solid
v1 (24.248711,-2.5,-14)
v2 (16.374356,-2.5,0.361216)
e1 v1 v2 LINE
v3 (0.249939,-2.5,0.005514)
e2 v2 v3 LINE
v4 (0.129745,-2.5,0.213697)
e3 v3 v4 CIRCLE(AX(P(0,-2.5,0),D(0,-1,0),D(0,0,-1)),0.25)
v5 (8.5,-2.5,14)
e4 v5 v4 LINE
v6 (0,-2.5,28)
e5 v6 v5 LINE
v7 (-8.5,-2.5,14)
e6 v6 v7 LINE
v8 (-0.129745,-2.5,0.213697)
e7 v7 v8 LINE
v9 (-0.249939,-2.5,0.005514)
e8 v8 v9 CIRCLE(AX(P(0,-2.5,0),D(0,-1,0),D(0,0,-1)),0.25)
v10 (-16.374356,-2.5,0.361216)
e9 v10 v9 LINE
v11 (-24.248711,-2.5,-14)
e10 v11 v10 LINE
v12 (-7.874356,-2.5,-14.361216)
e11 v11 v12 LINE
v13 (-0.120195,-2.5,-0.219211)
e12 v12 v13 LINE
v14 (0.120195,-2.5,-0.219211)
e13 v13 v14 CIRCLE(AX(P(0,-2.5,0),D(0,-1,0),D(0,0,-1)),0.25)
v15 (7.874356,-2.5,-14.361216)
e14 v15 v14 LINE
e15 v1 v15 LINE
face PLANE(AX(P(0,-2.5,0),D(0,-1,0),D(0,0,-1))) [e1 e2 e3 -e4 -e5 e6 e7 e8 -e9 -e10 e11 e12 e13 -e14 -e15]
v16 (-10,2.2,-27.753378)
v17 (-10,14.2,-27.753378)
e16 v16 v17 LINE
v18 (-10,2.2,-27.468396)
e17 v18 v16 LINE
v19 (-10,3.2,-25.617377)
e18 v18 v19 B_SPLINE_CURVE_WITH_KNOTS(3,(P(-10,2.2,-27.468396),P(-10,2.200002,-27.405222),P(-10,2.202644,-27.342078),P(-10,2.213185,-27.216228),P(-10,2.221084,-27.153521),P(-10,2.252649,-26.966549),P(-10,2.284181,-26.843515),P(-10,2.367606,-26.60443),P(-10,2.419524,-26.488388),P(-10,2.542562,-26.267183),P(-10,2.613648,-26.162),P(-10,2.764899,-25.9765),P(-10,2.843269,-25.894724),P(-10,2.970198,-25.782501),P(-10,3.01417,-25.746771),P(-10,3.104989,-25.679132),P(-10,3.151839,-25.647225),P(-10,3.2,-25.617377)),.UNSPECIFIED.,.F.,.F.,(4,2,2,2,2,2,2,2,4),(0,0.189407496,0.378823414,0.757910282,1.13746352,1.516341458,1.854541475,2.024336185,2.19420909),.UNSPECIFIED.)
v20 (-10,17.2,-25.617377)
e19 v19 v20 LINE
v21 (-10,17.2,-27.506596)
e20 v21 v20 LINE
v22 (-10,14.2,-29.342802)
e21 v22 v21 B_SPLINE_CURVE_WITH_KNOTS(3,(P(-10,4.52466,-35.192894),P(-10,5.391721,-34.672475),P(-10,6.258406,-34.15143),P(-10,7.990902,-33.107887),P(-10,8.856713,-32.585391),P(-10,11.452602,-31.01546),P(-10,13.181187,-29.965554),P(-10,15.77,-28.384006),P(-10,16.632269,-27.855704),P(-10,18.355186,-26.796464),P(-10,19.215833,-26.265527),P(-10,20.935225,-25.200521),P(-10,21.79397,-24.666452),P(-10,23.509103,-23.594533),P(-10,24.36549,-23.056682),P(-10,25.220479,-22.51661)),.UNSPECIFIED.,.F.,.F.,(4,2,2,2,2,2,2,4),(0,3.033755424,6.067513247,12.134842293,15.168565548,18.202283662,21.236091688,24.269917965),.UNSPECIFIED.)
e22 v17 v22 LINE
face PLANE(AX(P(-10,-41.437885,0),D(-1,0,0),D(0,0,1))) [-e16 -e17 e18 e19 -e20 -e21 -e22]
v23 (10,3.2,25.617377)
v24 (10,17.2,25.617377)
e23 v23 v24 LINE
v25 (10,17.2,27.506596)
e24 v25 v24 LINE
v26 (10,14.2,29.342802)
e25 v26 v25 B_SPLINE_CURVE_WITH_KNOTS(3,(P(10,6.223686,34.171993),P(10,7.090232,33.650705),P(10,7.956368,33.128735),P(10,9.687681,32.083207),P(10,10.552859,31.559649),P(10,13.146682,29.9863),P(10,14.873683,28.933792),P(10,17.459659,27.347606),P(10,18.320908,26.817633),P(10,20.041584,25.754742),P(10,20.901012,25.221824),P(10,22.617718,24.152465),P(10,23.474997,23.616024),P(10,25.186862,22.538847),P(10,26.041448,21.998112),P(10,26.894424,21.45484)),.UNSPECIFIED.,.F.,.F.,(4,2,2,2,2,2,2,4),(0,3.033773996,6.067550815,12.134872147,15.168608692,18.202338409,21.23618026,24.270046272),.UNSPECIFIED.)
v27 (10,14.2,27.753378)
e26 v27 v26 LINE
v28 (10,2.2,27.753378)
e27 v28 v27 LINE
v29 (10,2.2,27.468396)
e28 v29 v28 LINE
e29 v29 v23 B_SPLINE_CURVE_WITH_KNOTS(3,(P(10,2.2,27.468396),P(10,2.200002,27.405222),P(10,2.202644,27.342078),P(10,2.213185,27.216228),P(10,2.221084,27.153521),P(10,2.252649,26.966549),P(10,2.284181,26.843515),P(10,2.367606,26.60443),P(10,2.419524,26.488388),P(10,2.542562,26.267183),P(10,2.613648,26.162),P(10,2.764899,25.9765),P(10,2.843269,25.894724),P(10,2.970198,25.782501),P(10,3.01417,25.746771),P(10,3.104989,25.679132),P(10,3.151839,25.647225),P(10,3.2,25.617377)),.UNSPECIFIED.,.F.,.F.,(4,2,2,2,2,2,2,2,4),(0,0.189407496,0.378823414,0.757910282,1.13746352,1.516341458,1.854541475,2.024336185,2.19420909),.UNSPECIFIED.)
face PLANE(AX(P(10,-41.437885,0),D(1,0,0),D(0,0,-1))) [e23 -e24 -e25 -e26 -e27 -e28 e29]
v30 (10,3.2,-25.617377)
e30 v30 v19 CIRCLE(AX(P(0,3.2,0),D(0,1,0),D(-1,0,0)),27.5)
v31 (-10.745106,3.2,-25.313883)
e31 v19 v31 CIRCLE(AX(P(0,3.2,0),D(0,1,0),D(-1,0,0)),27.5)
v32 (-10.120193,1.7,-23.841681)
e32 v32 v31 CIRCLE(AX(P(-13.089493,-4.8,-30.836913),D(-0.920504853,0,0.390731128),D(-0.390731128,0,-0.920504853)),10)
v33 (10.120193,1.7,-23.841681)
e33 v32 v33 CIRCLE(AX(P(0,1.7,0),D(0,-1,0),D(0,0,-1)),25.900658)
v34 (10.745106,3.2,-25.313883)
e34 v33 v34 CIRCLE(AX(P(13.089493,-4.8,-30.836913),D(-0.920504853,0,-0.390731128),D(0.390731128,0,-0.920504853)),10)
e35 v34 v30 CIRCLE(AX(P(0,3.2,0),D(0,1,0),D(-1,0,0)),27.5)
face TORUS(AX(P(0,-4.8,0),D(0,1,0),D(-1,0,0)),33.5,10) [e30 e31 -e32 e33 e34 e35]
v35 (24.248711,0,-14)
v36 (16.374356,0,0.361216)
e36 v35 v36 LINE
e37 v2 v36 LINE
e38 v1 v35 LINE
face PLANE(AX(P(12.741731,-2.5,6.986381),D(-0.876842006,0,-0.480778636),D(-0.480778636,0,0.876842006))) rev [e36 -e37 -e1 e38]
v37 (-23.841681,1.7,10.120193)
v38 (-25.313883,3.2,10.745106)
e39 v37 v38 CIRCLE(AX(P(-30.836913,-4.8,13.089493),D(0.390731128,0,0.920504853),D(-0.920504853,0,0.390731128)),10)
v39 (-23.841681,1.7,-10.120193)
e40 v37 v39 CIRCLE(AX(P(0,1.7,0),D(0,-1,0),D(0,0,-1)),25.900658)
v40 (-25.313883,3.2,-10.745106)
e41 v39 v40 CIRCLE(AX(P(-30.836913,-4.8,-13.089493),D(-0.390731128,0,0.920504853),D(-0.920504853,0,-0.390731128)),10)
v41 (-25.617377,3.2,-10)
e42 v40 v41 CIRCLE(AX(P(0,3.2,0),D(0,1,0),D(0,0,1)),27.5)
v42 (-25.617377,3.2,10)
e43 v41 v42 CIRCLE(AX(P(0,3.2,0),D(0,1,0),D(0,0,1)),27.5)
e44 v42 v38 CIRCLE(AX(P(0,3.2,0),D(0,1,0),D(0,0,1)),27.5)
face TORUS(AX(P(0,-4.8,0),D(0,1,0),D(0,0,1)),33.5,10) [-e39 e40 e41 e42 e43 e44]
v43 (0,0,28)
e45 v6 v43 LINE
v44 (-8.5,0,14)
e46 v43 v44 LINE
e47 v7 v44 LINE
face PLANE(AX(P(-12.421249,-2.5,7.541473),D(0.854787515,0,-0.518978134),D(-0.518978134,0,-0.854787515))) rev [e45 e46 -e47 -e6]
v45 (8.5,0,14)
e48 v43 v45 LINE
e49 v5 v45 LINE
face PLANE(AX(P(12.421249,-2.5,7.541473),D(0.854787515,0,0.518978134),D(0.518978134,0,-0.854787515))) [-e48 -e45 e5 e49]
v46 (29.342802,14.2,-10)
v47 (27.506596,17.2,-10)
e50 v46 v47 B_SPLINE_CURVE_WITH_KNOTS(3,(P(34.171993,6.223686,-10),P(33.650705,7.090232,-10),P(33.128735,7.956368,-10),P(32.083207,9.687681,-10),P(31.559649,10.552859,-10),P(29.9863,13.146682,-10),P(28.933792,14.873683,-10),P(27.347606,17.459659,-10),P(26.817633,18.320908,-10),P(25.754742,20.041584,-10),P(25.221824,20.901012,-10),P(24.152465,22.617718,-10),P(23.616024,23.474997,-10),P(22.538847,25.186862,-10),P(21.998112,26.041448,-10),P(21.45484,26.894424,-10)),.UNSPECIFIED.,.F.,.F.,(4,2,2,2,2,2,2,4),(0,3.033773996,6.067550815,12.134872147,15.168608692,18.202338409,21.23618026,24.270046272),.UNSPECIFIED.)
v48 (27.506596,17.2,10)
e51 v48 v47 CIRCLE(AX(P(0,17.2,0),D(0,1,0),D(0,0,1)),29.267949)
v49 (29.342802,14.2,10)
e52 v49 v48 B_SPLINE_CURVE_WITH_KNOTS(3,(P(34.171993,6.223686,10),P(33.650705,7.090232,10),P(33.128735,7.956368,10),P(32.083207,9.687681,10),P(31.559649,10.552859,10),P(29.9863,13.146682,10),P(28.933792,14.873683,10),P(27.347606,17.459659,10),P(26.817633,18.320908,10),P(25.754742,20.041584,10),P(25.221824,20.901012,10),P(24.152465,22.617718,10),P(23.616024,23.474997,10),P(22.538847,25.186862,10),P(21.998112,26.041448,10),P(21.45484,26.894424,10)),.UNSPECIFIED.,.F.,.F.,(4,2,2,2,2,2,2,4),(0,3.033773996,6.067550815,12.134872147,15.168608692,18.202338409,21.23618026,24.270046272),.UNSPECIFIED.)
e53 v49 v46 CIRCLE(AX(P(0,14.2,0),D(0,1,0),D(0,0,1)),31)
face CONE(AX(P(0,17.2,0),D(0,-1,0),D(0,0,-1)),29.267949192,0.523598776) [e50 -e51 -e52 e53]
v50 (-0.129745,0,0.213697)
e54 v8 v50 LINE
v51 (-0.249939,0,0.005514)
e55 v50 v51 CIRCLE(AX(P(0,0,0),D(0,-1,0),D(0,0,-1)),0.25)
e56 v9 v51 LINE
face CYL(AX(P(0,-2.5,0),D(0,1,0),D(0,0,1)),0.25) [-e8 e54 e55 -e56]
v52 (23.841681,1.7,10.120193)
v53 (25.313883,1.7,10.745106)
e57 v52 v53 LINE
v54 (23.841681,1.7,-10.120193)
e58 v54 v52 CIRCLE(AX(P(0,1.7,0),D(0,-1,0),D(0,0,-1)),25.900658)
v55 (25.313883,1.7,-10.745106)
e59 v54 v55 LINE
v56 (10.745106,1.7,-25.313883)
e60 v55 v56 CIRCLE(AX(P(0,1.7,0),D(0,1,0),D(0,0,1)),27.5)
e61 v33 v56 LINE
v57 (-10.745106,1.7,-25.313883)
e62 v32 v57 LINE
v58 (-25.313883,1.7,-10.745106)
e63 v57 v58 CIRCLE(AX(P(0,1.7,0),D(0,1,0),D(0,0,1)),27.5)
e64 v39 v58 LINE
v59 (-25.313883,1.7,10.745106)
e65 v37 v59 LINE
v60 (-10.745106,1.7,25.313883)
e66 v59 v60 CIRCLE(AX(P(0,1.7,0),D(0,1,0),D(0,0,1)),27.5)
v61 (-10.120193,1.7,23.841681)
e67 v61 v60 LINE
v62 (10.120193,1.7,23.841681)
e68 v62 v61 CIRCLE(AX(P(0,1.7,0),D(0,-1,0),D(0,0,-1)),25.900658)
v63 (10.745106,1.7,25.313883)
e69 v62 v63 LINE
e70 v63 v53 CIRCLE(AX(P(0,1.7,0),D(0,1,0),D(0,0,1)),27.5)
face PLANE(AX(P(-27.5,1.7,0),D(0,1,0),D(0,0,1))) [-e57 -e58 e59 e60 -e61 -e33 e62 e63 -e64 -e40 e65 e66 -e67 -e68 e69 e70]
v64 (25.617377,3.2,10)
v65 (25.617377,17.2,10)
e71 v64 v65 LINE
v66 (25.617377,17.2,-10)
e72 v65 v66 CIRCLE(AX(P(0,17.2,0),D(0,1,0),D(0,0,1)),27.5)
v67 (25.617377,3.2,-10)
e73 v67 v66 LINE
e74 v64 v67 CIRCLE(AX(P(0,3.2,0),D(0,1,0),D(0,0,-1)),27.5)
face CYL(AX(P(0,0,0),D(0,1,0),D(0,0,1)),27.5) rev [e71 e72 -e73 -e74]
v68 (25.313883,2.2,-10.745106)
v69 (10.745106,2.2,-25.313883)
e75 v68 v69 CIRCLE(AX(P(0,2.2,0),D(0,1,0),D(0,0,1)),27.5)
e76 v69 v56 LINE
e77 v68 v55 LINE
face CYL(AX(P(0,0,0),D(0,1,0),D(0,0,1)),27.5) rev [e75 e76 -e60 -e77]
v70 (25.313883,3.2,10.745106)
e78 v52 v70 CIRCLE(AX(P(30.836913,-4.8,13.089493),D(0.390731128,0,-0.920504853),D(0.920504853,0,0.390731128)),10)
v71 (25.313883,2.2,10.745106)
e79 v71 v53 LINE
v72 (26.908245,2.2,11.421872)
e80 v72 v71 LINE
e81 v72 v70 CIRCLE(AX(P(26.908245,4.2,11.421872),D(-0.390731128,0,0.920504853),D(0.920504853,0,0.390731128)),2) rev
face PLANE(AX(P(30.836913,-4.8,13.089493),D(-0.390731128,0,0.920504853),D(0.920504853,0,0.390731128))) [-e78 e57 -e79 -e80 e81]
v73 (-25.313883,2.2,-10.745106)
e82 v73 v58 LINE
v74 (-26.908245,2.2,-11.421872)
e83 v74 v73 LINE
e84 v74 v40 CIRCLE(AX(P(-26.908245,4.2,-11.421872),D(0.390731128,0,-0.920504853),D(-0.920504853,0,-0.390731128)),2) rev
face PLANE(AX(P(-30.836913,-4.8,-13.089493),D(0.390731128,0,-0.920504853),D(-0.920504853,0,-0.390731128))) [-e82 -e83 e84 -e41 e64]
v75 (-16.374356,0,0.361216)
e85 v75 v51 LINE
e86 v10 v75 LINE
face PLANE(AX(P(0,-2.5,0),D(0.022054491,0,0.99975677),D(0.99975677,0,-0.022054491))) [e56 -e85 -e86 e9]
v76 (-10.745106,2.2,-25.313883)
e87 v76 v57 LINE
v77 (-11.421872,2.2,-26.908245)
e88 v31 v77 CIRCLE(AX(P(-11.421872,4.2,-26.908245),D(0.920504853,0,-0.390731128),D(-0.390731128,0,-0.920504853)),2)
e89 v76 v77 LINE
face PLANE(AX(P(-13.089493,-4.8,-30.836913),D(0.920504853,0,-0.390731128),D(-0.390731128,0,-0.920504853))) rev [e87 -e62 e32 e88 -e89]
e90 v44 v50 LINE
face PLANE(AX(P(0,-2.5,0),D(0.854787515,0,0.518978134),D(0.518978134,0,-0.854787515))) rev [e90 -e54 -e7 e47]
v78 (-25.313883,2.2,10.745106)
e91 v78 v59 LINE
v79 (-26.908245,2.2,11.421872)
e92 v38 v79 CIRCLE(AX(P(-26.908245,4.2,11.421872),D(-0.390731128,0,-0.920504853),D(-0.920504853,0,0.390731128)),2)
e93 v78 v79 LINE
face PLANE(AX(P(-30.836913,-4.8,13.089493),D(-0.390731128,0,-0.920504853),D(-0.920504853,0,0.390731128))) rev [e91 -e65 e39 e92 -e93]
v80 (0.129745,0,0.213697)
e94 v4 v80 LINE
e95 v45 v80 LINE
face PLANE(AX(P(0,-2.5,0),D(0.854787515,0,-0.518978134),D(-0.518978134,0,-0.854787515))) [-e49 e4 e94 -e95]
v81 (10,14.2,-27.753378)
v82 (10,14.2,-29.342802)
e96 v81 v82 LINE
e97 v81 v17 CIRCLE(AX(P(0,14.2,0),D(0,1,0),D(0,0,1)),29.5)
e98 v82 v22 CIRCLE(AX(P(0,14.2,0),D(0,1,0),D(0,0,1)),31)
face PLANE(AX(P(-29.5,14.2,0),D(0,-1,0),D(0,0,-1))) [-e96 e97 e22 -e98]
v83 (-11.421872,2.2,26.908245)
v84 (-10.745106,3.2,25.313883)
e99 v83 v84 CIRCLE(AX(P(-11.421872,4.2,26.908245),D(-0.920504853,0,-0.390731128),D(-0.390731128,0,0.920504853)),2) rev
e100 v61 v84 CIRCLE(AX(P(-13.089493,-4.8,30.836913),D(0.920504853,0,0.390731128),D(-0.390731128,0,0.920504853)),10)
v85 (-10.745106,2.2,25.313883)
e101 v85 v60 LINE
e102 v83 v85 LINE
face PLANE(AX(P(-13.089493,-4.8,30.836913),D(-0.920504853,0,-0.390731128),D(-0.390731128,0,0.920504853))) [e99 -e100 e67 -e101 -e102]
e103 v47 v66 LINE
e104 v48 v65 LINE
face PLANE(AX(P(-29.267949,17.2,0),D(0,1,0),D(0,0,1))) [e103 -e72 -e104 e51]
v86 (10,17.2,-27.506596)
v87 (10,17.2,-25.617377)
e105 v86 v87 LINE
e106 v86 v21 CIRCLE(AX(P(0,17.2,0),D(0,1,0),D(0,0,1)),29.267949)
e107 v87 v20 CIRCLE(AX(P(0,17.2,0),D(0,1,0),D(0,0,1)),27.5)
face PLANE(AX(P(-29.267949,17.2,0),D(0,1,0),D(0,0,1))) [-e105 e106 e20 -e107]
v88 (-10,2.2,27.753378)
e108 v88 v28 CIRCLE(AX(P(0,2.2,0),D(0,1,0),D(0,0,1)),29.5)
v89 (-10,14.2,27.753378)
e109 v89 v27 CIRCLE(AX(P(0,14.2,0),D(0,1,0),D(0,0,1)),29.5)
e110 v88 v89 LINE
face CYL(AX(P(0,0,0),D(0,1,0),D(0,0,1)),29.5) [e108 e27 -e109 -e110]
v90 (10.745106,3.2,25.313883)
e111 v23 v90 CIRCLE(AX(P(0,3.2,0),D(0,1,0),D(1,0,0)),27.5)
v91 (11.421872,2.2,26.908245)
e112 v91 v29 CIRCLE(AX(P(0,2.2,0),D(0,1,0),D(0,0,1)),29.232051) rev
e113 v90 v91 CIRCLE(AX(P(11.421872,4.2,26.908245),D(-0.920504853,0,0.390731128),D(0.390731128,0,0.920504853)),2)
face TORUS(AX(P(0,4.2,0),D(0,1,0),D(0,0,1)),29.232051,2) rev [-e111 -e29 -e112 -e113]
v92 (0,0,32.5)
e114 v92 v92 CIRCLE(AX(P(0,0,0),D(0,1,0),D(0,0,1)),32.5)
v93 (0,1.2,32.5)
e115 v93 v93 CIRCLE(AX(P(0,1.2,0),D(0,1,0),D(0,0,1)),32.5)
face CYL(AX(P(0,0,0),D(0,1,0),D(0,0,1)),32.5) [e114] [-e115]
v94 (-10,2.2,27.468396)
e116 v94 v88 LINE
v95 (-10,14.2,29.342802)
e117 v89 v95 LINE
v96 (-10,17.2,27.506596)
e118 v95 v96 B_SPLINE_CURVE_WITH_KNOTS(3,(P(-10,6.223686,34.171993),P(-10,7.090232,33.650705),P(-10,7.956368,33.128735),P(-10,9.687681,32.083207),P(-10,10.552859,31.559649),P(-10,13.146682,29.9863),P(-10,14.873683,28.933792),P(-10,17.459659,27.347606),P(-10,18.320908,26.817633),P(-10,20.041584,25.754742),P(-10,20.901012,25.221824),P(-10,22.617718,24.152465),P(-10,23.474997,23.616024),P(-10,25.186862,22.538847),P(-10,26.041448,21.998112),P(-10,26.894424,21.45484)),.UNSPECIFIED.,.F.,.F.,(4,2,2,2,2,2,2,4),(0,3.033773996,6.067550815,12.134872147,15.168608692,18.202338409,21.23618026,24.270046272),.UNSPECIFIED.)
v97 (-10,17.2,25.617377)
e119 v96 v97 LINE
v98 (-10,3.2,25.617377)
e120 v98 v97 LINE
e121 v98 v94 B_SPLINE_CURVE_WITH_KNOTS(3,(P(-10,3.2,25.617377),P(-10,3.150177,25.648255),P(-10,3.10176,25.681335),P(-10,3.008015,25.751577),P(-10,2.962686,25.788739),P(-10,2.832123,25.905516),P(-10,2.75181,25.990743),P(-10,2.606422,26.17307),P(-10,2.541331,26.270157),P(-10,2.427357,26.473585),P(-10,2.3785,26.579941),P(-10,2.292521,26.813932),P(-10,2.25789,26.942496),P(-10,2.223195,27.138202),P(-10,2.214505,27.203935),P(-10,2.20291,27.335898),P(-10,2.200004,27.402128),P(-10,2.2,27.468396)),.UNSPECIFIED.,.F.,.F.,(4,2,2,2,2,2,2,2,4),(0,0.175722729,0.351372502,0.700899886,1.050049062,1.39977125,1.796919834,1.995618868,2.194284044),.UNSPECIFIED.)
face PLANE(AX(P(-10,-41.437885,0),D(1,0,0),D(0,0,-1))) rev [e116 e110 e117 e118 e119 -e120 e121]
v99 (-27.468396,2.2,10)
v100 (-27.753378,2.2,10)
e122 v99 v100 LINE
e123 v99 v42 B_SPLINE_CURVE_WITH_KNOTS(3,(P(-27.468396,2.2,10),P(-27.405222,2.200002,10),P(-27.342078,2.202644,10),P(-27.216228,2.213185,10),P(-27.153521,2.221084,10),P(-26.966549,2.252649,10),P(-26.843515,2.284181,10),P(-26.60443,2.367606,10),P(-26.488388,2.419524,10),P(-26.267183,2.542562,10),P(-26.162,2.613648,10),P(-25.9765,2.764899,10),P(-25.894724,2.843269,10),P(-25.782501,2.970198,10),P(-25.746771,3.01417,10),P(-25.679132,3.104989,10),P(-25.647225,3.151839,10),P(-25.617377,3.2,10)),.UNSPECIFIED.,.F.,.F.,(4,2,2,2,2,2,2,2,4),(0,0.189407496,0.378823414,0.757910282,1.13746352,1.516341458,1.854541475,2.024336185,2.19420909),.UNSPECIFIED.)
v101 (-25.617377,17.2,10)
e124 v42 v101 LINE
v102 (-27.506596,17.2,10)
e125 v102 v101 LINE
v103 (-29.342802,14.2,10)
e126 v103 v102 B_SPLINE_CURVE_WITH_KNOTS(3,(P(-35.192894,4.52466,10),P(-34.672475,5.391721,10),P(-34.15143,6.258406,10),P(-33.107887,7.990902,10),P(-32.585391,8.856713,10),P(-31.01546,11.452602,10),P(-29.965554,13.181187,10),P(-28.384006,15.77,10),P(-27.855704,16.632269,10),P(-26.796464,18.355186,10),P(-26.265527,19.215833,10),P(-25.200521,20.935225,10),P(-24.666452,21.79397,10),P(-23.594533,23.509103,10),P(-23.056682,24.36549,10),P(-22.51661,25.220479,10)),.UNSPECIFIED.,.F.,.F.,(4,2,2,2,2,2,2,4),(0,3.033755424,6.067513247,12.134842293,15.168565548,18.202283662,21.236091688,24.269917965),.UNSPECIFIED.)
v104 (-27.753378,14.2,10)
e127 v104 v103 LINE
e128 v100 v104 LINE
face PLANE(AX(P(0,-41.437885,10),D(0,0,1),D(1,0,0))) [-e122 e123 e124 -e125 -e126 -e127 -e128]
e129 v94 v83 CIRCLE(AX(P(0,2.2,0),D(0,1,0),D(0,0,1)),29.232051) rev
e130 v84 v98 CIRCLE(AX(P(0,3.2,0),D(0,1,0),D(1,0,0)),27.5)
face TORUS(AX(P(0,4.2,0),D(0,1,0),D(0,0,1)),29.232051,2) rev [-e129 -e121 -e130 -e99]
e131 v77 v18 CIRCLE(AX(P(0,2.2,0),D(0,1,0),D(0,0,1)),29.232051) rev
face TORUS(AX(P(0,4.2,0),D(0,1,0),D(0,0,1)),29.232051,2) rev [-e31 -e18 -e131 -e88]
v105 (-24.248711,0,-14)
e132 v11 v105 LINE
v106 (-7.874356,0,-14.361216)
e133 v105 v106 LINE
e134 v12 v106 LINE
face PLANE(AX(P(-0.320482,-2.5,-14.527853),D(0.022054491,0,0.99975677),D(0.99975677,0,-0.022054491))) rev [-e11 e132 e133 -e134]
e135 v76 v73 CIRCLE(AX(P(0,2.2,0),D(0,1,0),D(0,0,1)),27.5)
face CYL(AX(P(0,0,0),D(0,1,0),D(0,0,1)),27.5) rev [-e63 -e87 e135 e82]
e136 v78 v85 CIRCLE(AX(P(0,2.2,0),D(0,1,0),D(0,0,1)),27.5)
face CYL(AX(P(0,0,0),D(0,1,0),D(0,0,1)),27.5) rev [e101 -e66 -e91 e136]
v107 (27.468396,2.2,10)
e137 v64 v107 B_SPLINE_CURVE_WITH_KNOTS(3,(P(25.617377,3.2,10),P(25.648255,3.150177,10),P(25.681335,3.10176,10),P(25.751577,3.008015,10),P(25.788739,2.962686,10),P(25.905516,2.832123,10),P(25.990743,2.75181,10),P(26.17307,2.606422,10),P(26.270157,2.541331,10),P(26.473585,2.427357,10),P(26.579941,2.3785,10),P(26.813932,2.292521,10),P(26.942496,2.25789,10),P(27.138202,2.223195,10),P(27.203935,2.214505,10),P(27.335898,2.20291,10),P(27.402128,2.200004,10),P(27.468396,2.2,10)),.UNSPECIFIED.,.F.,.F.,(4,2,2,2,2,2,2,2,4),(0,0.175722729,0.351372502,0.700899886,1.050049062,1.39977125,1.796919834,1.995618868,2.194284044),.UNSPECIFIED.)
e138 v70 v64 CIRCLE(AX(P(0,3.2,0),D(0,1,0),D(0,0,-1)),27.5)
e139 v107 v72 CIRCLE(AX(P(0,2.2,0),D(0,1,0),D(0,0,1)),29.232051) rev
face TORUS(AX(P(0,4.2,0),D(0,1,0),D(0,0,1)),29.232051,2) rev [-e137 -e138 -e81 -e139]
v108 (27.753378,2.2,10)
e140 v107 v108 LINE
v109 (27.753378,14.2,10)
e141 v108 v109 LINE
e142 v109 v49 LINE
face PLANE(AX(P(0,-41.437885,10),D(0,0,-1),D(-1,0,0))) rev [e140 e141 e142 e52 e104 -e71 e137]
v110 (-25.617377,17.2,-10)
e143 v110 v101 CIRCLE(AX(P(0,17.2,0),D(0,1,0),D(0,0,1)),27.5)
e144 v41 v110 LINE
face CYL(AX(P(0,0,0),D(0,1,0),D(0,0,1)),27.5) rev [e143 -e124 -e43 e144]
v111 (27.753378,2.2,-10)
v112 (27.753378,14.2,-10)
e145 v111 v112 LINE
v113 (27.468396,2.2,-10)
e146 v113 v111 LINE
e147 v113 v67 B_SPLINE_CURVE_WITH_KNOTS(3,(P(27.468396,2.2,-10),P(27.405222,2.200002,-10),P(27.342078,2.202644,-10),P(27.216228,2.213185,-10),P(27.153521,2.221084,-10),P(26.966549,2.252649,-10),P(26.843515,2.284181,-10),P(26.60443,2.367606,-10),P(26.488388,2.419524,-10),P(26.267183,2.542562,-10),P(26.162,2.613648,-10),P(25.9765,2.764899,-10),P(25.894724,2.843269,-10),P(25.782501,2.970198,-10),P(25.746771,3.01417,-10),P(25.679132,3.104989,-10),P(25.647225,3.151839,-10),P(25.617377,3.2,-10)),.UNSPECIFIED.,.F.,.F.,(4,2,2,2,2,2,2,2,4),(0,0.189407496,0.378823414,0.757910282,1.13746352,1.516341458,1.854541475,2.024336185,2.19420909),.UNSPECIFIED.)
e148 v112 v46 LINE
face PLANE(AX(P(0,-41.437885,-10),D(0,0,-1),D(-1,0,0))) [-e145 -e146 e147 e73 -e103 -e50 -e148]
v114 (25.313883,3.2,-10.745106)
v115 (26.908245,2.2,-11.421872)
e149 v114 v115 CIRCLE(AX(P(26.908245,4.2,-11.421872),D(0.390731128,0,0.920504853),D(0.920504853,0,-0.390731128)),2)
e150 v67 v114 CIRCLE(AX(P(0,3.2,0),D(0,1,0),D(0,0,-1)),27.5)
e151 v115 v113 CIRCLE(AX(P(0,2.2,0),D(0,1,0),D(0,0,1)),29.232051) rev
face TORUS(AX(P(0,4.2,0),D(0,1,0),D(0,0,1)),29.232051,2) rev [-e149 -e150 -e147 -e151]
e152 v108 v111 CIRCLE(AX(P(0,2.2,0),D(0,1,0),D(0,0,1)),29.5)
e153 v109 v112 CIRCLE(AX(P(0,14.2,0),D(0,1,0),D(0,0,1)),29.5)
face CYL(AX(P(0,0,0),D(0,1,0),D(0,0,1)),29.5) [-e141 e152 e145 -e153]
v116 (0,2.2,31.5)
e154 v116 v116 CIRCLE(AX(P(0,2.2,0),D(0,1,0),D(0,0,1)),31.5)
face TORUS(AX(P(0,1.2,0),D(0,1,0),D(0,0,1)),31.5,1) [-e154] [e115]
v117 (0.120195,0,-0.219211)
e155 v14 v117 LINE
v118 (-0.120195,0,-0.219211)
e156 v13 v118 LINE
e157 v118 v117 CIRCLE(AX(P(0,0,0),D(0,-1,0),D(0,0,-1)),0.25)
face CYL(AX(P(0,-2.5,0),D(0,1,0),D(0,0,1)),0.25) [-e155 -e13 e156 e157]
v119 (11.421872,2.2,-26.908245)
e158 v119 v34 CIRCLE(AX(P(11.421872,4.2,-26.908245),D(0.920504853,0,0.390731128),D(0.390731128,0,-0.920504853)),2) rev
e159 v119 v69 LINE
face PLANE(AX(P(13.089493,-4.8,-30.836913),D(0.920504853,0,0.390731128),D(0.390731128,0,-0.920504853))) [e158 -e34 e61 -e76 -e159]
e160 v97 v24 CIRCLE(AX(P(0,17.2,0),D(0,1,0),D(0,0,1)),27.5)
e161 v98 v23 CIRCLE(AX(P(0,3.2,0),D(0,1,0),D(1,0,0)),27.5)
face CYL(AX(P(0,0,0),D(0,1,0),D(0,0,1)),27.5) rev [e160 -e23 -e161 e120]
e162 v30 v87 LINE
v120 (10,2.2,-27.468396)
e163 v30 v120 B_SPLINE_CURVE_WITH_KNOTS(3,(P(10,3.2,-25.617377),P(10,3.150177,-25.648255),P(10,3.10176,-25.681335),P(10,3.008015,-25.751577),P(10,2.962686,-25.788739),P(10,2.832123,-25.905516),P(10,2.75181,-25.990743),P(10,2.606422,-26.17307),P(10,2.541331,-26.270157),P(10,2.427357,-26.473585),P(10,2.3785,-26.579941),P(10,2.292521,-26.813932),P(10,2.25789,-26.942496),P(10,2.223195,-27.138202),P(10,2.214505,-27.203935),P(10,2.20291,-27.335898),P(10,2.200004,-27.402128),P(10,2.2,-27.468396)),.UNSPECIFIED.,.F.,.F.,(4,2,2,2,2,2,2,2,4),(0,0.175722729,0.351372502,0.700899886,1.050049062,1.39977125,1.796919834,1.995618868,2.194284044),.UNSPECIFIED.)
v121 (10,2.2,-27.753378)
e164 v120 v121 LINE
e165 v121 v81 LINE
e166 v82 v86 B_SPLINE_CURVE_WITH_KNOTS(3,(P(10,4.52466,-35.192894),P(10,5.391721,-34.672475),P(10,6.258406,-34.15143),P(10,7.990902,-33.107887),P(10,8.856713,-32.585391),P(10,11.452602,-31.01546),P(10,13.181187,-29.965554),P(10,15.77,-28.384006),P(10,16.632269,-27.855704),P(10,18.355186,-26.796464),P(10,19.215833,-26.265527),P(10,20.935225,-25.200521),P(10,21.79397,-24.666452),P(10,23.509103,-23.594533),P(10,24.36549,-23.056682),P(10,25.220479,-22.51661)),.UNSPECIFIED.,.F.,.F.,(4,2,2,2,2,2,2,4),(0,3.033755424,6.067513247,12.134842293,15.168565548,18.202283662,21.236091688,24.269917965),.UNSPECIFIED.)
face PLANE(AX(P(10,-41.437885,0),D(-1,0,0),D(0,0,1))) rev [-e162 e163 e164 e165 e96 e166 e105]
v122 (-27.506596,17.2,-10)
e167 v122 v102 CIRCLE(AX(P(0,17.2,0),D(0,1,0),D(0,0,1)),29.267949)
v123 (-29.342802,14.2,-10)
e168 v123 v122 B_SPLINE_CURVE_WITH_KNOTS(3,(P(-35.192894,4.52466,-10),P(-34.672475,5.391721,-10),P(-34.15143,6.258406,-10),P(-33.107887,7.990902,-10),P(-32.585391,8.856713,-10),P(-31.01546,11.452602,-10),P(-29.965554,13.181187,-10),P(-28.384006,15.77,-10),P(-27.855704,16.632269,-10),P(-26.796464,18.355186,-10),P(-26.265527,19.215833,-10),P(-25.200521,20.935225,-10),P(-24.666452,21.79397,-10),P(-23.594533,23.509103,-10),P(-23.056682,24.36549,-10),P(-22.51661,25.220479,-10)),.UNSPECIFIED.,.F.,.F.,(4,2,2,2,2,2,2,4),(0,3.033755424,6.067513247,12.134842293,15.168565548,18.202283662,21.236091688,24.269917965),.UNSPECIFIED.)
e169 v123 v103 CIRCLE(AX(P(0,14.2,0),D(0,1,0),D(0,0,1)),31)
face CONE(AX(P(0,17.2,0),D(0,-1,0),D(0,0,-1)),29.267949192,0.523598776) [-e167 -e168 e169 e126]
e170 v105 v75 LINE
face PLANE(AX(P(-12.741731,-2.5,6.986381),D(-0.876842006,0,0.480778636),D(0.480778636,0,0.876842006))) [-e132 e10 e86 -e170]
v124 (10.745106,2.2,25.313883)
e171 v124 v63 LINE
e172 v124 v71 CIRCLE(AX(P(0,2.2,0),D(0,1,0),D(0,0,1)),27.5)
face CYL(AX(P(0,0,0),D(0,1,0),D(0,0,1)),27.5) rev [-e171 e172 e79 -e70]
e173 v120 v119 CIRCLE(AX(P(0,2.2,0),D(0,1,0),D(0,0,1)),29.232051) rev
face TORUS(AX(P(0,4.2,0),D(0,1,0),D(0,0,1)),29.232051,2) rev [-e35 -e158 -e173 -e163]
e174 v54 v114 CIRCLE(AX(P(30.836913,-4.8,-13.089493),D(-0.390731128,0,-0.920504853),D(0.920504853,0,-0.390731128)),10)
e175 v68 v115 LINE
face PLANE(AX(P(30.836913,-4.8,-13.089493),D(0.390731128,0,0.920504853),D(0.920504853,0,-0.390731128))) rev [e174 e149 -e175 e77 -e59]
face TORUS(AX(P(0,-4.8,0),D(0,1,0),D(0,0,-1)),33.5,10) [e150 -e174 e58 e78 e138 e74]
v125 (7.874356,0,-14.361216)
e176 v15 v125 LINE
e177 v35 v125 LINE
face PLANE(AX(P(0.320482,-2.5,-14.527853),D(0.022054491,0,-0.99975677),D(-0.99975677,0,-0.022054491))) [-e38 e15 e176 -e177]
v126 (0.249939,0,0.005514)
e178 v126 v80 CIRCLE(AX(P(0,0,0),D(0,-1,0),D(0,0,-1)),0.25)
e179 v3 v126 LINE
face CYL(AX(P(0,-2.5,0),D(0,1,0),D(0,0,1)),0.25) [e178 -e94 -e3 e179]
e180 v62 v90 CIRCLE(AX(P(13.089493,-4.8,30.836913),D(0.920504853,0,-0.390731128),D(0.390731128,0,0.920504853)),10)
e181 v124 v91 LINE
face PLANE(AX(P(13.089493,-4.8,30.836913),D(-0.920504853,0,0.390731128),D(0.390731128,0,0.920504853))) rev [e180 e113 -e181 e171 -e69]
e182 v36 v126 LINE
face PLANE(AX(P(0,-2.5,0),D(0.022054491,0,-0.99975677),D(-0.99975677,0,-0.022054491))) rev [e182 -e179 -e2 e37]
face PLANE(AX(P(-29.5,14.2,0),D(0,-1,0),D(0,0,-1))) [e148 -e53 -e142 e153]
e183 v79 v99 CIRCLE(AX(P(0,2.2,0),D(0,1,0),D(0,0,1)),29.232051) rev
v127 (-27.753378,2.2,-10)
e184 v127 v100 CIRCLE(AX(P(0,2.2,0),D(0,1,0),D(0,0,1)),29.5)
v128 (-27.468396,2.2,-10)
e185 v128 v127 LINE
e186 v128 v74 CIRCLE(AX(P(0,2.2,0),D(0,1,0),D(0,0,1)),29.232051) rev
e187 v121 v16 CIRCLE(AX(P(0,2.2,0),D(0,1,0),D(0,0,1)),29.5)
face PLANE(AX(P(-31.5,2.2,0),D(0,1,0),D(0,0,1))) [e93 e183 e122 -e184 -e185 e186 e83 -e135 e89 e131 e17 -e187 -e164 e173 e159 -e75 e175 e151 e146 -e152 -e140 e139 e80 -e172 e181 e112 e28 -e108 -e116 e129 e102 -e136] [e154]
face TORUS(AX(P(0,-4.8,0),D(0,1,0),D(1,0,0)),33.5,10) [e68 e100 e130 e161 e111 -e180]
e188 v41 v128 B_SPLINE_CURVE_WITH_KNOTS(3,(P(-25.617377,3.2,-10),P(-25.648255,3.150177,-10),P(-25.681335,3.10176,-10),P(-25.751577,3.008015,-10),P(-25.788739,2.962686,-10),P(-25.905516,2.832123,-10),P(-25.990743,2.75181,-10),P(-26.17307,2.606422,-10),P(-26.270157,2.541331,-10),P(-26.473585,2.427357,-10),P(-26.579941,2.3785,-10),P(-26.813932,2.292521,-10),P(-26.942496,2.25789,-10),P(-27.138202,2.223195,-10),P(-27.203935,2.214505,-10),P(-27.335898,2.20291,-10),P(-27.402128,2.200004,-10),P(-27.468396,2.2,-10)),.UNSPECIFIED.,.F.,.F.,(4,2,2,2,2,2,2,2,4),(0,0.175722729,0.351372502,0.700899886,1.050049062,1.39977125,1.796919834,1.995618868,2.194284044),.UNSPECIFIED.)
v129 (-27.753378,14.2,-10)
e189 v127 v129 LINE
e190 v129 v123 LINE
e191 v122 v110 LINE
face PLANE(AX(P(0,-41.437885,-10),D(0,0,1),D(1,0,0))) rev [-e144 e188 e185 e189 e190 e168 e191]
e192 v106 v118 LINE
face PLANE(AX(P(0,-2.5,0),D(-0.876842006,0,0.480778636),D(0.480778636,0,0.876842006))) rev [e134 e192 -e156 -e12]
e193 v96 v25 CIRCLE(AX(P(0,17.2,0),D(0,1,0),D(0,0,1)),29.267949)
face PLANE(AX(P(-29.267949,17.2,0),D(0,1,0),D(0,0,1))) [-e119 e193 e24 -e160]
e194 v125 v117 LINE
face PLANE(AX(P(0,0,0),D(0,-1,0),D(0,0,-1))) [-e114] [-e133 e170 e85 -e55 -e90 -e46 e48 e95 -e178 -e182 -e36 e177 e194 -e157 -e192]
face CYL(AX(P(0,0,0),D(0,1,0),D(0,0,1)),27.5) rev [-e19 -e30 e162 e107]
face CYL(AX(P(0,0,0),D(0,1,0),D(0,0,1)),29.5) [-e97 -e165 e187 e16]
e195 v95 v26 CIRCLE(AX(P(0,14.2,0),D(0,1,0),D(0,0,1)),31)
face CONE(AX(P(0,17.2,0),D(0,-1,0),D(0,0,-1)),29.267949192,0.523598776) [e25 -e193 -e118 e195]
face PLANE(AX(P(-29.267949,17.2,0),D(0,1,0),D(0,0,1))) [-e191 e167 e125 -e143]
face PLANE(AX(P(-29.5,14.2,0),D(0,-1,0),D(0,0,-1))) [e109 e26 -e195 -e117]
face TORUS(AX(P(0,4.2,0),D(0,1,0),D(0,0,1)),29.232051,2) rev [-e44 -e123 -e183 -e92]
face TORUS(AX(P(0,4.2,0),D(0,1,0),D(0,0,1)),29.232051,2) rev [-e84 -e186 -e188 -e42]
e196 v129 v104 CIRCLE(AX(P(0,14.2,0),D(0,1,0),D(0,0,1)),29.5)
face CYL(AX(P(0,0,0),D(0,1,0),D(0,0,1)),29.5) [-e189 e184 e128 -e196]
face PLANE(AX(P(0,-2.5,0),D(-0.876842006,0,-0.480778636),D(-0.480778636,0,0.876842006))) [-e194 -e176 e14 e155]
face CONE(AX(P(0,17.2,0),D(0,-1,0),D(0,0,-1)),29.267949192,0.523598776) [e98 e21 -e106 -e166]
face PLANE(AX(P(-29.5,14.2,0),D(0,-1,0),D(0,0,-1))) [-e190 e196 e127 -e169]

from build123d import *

# Parameters (mm, degrees)
CUT_EXTRUDE_1_REACH      = 51.075
REVOLVE_2_ANGLE          = 46
PATTERN_CIRCULAR_6_COUNT = 4
FILLET_3_R               = 2
SKETCH_4_R               = 0.25
EXTRUDE_1_DEPTH          = 2.5


with BuildPart() as part:
    # Эскиз1 → Повернуть1 (revolve)
    with BuildSketch(Plane.XY, mode=Mode.PRIVATE) as revolve_1_sk:
        with BuildLine():
            Line((0, 0), (-32.5, 0))
            Line((-32.5, 0), (-32.5, 1.2))
            ThreePointArc((-32.5, 1.2), (-32.207106781, 1.907106781), (-31.5, 2.2))
            Line((-31.5, 2.2), (-29.5, 2.2))
            Line((-29.5, 2.2), (-29.5, 14.2))
            Line((-29.5, 14.2), (-31, 14.2))
            Line((-31, 14.2), (-29.267949192, 17.2))
            Line((-29.267949192, 17.2), (-27.5, 17.2))
            Line((-27.5, 17.2), (-27.5, 1.7))
            Line((-27.5, 1.7), (0, 1.7))
            Line((0, 1.7), (0, 0))
        make_face()
    revolve(revolve_1_sk.sketch.rotate(Axis((0, 0, 0), (0, -1, 0)), 270), axis=Axis((0, 0, 0), (0, -1, 0)))

    # Вырез-Вытянуть1: up to this face of the body (flat: up to its plane)
    cut_extrude_1_end = Plane(part.part.faces().sort_by_distance((0, 2.2, -30.609045456))[0])
    # Эскиз2 → Вырез-Вытянуть1 (cut, up to the picked face)
    with BuildSketch(Plane(origin=(0, 17.2, 0), x_dir=(1, 0, 0), z_dir=(0, 1, 0)), mode=Mode.PRIVATE) as cut_extrude_1_sk1:
        with BuildLine():
            Line((-10, 27.50659648), (-10, 40.856644609))
            ThreePointArc((-10, 40.856644609), (-29.742775667, 29.742775667), (-40.856644609, 10))
            Line((-40.856644609, 10), (-27.50659648, 10))
            ThreePointArc((-27.50659648, 10), (-20.695565345, 20.695565345), (-10, 27.50659648))
        make_face()
    cut_extrude_1_tool1 = split(extrude(cut_extrude_1_sk1.sketch, amount=-CUT_EXTRUDE_1_REACH, mode=Mode.PRIVATE), bisect_by=cut_extrude_1_end, keep=Keep.BOTH, mode=Mode.PRIVATE)
    # Эскиз2 → Вырез-Вытянуть1 (cut, up to the picked face)
    with BuildSketch(Plane(origin=(0, 17.2, 0), x_dir=(1, 0, 0), z_dir=(0, 1, 0)), mode=Mode.PRIVATE) as cut_extrude_1_sk2:
        with BuildLine():
            ThreePointArc((27.50659648, 10), (20.695565345, 20.695565345), (10, 27.50659648))
            Line((10, 27.50659648), (10, 25.617376915))
            ThreePointArc((10, 25.617376915), (19.445436483, 19.445436483), (25.617376915, 10))
            Line((25.617376915, 10), (27.50659648, 10))
        make_face()
    cut_extrude_1_tool2 = split(extrude(cut_extrude_1_sk2.sketch, amount=-CUT_EXTRUDE_1_REACH, mode=Mode.PRIVATE), bisect_by=cut_extrude_1_end, keep=Keep.BOTH, mode=Mode.PRIVATE)
    # Эскиз2 → Вырез-Вытянуть1 (cut, up to the picked face)
    with BuildSketch(Plane(origin=(0, 17.2, 0), x_dir=(1, 0, 0), z_dir=(0, 1, 0)), mode=Mode.PRIVATE) as cut_extrude_1_sk3:
        with BuildLine():
            ThreePointArc((40.856644609, 10), (29.742775667, 29.742775667), (10, 40.856644609))
            Line((10, 40.856644609), (10, 27.50659648))
            ThreePointArc((10, 27.50659648), (20.695565345, 20.695565345), (27.50659648, 10))
            Line((27.50659648, 10), (40.856644609, 10))
        make_face()
    cut_extrude_1_tool3 = split(extrude(cut_extrude_1_sk3.sketch, amount=-CUT_EXTRUDE_1_REACH, mode=Mode.PRIVATE), bisect_by=cut_extrude_1_end, keep=Keep.BOTH, mode=Mode.PRIVATE)
    # Эскиз2 → Вырез-Вытянуть1 (cut, up to the picked face)
    with BuildSketch(Plane(origin=(0, 17.2, 0), x_dir=(1, 0, 0), z_dir=(0, 1, 0)), mode=Mode.PRIVATE) as cut_extrude_1_sk4:
        with BuildLine():
            ThreePointArc((10, -40.856644609), (29.742775667, -29.742775667), (40.856644609, -10))
            Line((40.856644609, -10), (27.50659648, -10))
            ThreePointArc((27.50659648, -10), (20.695565345, -20.695565345), (10, -27.50659648))
            Line((10, -27.50659648), (10, -40.856644609))
        make_face()
    cut_extrude_1_tool4 = split(extrude(cut_extrude_1_sk4.sketch, amount=-CUT_EXTRUDE_1_REACH, mode=Mode.PRIVATE), bisect_by=cut_extrude_1_end, keep=Keep.BOTH, mode=Mode.PRIVATE)
    # Эскиз2 → Вырез-Вытянуть1 (cut, up to the picked face)
    with BuildSketch(Plane(origin=(0, 17.2, 0), x_dir=(1, 0, 0), z_dir=(0, 1, 0)), mode=Mode.PRIVATE) as cut_extrude_1_sk5:
        with BuildLine():
            ThreePointArc((10, -27.50659648), (20.695565345, -20.695565345), (27.50659648, -10))
            Line((27.50659648, -10), (25.617376915, -10))
            ThreePointArc((25.617376915, -10), (19.445436483, -19.445436483), (10, -25.617376915))
            Line((10, -25.617376915), (10, -27.50659648))
        make_face()
    cut_extrude_1_tool5 = split(extrude(cut_extrude_1_sk5.sketch, amount=-CUT_EXTRUDE_1_REACH, mode=Mode.PRIVATE), bisect_by=cut_extrude_1_end, keep=Keep.BOTH, mode=Mode.PRIVATE)
    # Эскиз2 → Вырез-Вытянуть1 (cut, up to the picked face)
    with BuildSketch(Plane(origin=(0, 17.2, 0), x_dir=(1, 0, 0), z_dir=(0, 1, 0)), mode=Mode.PRIVATE) as cut_extrude_1_sk6:
        with BuildLine():
            Line((-27.50659648, -10), (-40.856644609, -10))
            ThreePointArc((-40.856644609, -10), (-29.742775667, -29.742775667), (-10, -40.856644609))
            Line((-10, -40.856644609), (-10, -27.50659648))
            ThreePointArc((-10, -27.50659648), (-20.695565345, -20.695565345), (-27.50659648, -10))
        make_face()
    cut_extrude_1_tool6 = split(extrude(cut_extrude_1_sk6.sketch, amount=-CUT_EXTRUDE_1_REACH, mode=Mode.PRIVATE), bisect_by=cut_extrude_1_end, keep=Keep.BOTH, mode=Mode.PRIVATE)
    # Эскиз2 → Вырез-Вытянуть1 (cut, up to the picked face)
    with BuildSketch(Plane(origin=(0, 17.2, 0), x_dir=(1, 0, 0), z_dir=(0, 1, 0)), mode=Mode.PRIVATE) as cut_extrude_1_sk7:
        with BuildLine():
            Line((-25.617376915, -10), (-27.50659648, -10))
            ThreePointArc((-27.50659648, -10), (-20.695565345, -20.695565345), (-10, -27.50659648))
            Line((-10, -27.50659648), (-10, -25.617376915))
            ThreePointArc((-10, -25.617376915), (-19.445436483, -19.445436483), (-25.617376915, -10))
        make_face()
    cut_extrude_1_tool7 = split(extrude(cut_extrude_1_sk7.sketch, amount=-CUT_EXTRUDE_1_REACH, mode=Mode.PRIVATE), bisect_by=cut_extrude_1_end, keep=Keep.BOTH, mode=Mode.PRIVATE)
    # Эскиз2 → Вырез-Вытянуть1 (cut, up to the picked face)
    with BuildSketch(Plane(origin=(0, 17.2, 0), x_dir=(1, 0, 0), z_dir=(0, 1, 0)), mode=Mode.PRIVATE) as cut_extrude_1_sk8:
        with BuildLine():
            Line((-10, 25.617376915), (-10, 27.50659648))
            ThreePointArc((-10, 27.50659648), (-20.695565345, 20.695565345), (-27.50659648, 10))
            Line((-27.50659648, 10), (-25.617376915, 10))
            ThreePointArc((-25.617376915, 10), (-19.445436483, 19.445436483), (-10, 25.617376915))
        make_face()
    cut_extrude_1_tool8 = split(extrude(cut_extrude_1_sk8.sketch, amount=-CUT_EXTRUDE_1_REACH, mode=Mode.PRIVATE), bisect_by=cut_extrude_1_end, keep=Keep.BOTH, mode=Mode.PRIVATE)
    add(cut_extrude_1_tool1.solids().sort_by(Axis((-24.563821, 17.2, -24.563821), (0, -1, 0)))[0], mode=Mode.SUBTRACT)
    add(cut_extrude_1_tool2.solids().sort_by(Axis((19.481832, 17.2, -19.481832), (0, -1, 0)))[0], mode=Mode.SUBTRACT)
    add(cut_extrude_1_tool3.solids().sort_by(Axis((24.563821, 17.2, -24.563821), (0, -1, 0)))[0], mode=Mode.SUBTRACT)
    add(cut_extrude_1_tool4.solids().sort_by(Axis((24.563821, 17.2, 24.563821), (0, -1, 0)))[0], mode=Mode.SUBTRACT)
    add(cut_extrude_1_tool5.solids().sort_by(Axis((19.481832, 17.2, 19.481832), (0, -1, 0)))[0], mode=Mode.SUBTRACT)
    add(cut_extrude_1_tool6.solids().sort_by(Axis((-24.563821, 17.2, 24.563821), (0, -1, 0)))[0], mode=Mode.SUBTRACT)
    add(cut_extrude_1_tool7.solids().sort_by(Axis((-19.481832, 17.2, 19.481832), (0, -1, 0)))[0], mode=Mode.SUBTRACT)
    add(cut_extrude_1_tool8.solids().sort_by(Axis((-19.481832, 17.2, -19.481832), (0, -1, 0)))[0], mode=Mode.SUBTRACT)

    # Повернуть2: read off the stored shape, not the designer's step
    # Повернуть2 outline → Повернуть2 (revolve)
    with BuildSketch(Plane(origin=(0, 0, 0), x_dir=(-0.9205048534524393, 0, -0.3907311284892762), z_dir=(0.3907311284892762, 0, -0.9205048534524393))):
        with BuildLine():
            Line((27.5, 1.7), (27.5, 3.2))
            ThreePointArc((27.5, 3.2), (26.65909171, 2.493968314), (25.900657923, 1.7))
            Line((25.900657923, 1.7), (27.5, 1.7))
        make_face()
    revolve_2 = revolve(axis=Axis((0, 0, 0), (0, 1, 0)), revolution_arc=REVOLVE_2_ANGLE)

    # Круговой массив6: Повернуть2 ×4 about axis
    pattern_circular_6_axis = Axis((0, 0, 0), (0, 1, 0))
    for i in range(1, PATTERN_CIRCULAR_6_COUNT):
        add(revolve_2.rotate(pattern_circular_6_axis, i * 360 / PATTERN_CIRCULAR_6_COUNT))

    # Скругление3
    # the kernel refuses this fillet: 2 mm, written as the material it adds along each edge
    with BuildSketch(Plane(origin=(0, 2.2, 0), x_dir=(-0.21306345885577038, 0, -0.9770383628601365), z_dir=(0.9770383628601365, 0, -0.21306345885577038))) as fillet_3_piece_1:
        with BuildLine():
            CenterArc((29.232050808, 2), FILLET_3_R, 210, 60)
            Line((27.5, 1), (27.5, 0))
            Line((27.5, 0), (29.232050808, 0))
        make_face()
    revolve(axis=Axis((0, 2.2, 0), (0, 1, 0)), revolution_arc=10.698060555)
    with BuildSketch(Plane(origin=(0, 2.2, 0), x_dir=(-0.9205048534524419, 0, -0.39073112848927005), z_dir=(0.39073112848927005, 0, -0.9205048534524419))) as fillet_3_piece_2:
        with BuildLine():
            CenterArc((29.232050808, 2), FILLET_3_R, 210, 60)
            Line((27.5, 1), (27.5, 0))
            Line((27.5, 0), (29.232050808, 0))
        make_face()
    revolve(axis=Axis((0, 2.2, 0), (0, 1, 0)), revolution_arc=10.698060555)
    with BuildSketch(Plane(origin=(0, 2.2, 0), x_dir=(-0.3907311284892926, 0, 0.9205048534524323), z_dir=(-0.9205048534524323, 0, -0.3907311284892926))) as fillet_3_piece_3:
        with BuildLine():
            CenterArc((29.232050808, 2), FILLET_3_R, 210, 60)
            Line((27.5, 1), (27.5, 0))
            Line((27.5, 0), (29.232050808, 0))
        make_face()
    revolve(axis=Axis((0, 2.2, 0), (0, 1, 0)), revolution_arc=10.698060555)
    with BuildSketch(Plane(origin=(0, 2.2, 0), x_dir=(0.9205048534524326, 0, 0.3907311284892922), z_dir=(-0.3907311284892922, 0, 0.9205048534524326))) as fillet_3_piece_4:
        with BuildLine():
            CenterArc((29.232050808, 2), FILLET_3_R, 210, 60)
            Line((27.5, 1), (27.5, 0))
            Line((27.5, 0), (29.232050808, 0))
        make_face()
    revolve(axis=Axis((0, 2.2, 0), (0, 1, 0)), revolution_arc=10.698060555)
    with BuildSketch(Plane(origin=(0, 2.2, 0), x_dir=(0.3907311284892925, 0, -0.9205048534524325), z_dir=(0.9205048534524325, 0, 0.3907311284892925))) as fillet_3_piece_5:
        with BuildLine():
            CenterArc((29.232050808, 2), FILLET_3_R, 210, 60)
            Line((27.5, 1), (27.5, 0))
            Line((27.5, 0), (29.232050808, 0))
        make_face()
    revolve(axis=Axis((0, 2.2, 0), (0, 1, 0)), revolution_arc=10.698060555)
    with BuildSketch(Plane(origin=(0, 2.2, 0), x_dir=(0.9770383628601332, 0, -0.21306345885578468), z_dir=(0.21306345885578468, 0, 0.9770383628601332))) as fillet_3_piece_6:
        with BuildLine():
            CenterArc((29.232050808, 2), FILLET_3_R, 210, 60)
            Line((27.5, 1), (27.5, 0))
            Line((27.5, 0), (29.232050808, 0))
        make_face()
    revolve(axis=Axis((0, 2.2, 0), (0, 1, 0)), revolution_arc=10.698060555)
    with BuildSketch(Plane(origin=(0, 2.2, 0), x_dir=(0.21306345885579284, 0, 0.9770383628601315), z_dir=(-0.9770383628601315, 0, 0.21306345885579284))) as fillet_3_piece_7:
        with BuildLine():
            CenterArc((29.232050808, 2), FILLET_3_R, 210, 60)
            Line((27.5, 1), (27.5, 0))
            Line((27.5, 0), (29.232050808, 0))
        make_face()
    revolve(axis=Axis((0, 2.2, 0), (0, 1, 0)), revolution_arc=10.698060555)
    with BuildSketch(Plane(origin=(0, 2.2, 0), x_dir=(-0.9770383628601342, 0, 0.21306345885578018), z_dir=(-0.21306345885578018, 0, -0.9770383628601342))) as fillet_3_piece_8:
        with BuildLine():
            CenterArc((29.232050808, 2), FILLET_3_R, 210, 60)
            Line((27.5, 1), (27.5, 0))
            Line((27.5, 0), (29.232050808, 0))
        make_face()
    revolve(axis=Axis((0, 2.2, 0), (0, 1, 0)), revolution_arc=10.698060555)

    # Эскиз4 → Бобышка-Вытянуть1 (add)
    with BuildSketch(Plane(origin=(0, 0, 0), x_dir=(-1, 0, 0), z_dir=(0, -1, 0))):
        Circle(SKETCH_4_R)
        Polygon((-8.5, -14), (0, 0), (8.5, -14), (0, -28), align=None)
        Polygon((16.374355653, -0.361215932), (0, 0), (7.874355653, 14.361215932), (24.248711306, 14), align=None)
        Polygon((-7.874355653, 14.361215932), (0, 0), (-16.374355653, -0.361215932), (-24.248711306, 14), align=None)
        with BuildLine():
            ThreePointArc((-0.249939193, -0.005513623), (-0.216506351, -0.125), (-0.129744534, -0.213696879))
            Line((-0.129744534, -0.213696879), (0, 0))
            Line((0, 0), (-0.249939193, -0.005513623))
        make_face()
        with BuildLine():
            ThreePointArc((-0.129744534, -0.213696879), (0, -0.25), (0.129744534, -0.213696879))
            Line((0.129744534, -0.213696879), (0, 0))
            Line((0, 0), (-0.129744534, -0.213696879))
        make_face()
        with BuildLine():
            Line((0, 0), (0.129744534, -0.213696879))
            ThreePointArc((0.129744534, -0.213696879), (0.216506351, -0.125), (0.249939193, -0.005513623))
            Line((0.249939193, -0.005513623), (0, 0))
        make_face()
        with BuildLine():
            Line((-0.120194659, 0.219210501), (0, 0))
            Line((0, 0), (0.120194659, 0.219210501))
            ThreePointArc((0.120194659, 0.219210501), (0, 0.25), (-0.120194659, 0.219210501))
        make_face()
        with BuildLine():
            Line((0.120194659, 0.219210501), (0, 0))
            Line((0, 0), (0.249939193, -0.005513623))
            ThreePointArc((0.249939193, -0.005513623), (0.249984798, -0.002756979), (0.25, 0))
            ThreePointArc((0.25, 0), (0.215114696, 0.127380013), (0.120194659, 0.219210501))
        make_face()
        with BuildLine():
            Line((-0.249939193, -0.005513623), (0, 0))
            Line((0, 0), (-0.120194659, 0.219210501))
            ThreePointArc((-0.120194659, 0.219210501), (-0.216506351, 0.125), (-0.249939193, -0.005513623))
        make_face()
    extrude(amount=EXTRUDE_1_DEPTH)


solid = part.part
